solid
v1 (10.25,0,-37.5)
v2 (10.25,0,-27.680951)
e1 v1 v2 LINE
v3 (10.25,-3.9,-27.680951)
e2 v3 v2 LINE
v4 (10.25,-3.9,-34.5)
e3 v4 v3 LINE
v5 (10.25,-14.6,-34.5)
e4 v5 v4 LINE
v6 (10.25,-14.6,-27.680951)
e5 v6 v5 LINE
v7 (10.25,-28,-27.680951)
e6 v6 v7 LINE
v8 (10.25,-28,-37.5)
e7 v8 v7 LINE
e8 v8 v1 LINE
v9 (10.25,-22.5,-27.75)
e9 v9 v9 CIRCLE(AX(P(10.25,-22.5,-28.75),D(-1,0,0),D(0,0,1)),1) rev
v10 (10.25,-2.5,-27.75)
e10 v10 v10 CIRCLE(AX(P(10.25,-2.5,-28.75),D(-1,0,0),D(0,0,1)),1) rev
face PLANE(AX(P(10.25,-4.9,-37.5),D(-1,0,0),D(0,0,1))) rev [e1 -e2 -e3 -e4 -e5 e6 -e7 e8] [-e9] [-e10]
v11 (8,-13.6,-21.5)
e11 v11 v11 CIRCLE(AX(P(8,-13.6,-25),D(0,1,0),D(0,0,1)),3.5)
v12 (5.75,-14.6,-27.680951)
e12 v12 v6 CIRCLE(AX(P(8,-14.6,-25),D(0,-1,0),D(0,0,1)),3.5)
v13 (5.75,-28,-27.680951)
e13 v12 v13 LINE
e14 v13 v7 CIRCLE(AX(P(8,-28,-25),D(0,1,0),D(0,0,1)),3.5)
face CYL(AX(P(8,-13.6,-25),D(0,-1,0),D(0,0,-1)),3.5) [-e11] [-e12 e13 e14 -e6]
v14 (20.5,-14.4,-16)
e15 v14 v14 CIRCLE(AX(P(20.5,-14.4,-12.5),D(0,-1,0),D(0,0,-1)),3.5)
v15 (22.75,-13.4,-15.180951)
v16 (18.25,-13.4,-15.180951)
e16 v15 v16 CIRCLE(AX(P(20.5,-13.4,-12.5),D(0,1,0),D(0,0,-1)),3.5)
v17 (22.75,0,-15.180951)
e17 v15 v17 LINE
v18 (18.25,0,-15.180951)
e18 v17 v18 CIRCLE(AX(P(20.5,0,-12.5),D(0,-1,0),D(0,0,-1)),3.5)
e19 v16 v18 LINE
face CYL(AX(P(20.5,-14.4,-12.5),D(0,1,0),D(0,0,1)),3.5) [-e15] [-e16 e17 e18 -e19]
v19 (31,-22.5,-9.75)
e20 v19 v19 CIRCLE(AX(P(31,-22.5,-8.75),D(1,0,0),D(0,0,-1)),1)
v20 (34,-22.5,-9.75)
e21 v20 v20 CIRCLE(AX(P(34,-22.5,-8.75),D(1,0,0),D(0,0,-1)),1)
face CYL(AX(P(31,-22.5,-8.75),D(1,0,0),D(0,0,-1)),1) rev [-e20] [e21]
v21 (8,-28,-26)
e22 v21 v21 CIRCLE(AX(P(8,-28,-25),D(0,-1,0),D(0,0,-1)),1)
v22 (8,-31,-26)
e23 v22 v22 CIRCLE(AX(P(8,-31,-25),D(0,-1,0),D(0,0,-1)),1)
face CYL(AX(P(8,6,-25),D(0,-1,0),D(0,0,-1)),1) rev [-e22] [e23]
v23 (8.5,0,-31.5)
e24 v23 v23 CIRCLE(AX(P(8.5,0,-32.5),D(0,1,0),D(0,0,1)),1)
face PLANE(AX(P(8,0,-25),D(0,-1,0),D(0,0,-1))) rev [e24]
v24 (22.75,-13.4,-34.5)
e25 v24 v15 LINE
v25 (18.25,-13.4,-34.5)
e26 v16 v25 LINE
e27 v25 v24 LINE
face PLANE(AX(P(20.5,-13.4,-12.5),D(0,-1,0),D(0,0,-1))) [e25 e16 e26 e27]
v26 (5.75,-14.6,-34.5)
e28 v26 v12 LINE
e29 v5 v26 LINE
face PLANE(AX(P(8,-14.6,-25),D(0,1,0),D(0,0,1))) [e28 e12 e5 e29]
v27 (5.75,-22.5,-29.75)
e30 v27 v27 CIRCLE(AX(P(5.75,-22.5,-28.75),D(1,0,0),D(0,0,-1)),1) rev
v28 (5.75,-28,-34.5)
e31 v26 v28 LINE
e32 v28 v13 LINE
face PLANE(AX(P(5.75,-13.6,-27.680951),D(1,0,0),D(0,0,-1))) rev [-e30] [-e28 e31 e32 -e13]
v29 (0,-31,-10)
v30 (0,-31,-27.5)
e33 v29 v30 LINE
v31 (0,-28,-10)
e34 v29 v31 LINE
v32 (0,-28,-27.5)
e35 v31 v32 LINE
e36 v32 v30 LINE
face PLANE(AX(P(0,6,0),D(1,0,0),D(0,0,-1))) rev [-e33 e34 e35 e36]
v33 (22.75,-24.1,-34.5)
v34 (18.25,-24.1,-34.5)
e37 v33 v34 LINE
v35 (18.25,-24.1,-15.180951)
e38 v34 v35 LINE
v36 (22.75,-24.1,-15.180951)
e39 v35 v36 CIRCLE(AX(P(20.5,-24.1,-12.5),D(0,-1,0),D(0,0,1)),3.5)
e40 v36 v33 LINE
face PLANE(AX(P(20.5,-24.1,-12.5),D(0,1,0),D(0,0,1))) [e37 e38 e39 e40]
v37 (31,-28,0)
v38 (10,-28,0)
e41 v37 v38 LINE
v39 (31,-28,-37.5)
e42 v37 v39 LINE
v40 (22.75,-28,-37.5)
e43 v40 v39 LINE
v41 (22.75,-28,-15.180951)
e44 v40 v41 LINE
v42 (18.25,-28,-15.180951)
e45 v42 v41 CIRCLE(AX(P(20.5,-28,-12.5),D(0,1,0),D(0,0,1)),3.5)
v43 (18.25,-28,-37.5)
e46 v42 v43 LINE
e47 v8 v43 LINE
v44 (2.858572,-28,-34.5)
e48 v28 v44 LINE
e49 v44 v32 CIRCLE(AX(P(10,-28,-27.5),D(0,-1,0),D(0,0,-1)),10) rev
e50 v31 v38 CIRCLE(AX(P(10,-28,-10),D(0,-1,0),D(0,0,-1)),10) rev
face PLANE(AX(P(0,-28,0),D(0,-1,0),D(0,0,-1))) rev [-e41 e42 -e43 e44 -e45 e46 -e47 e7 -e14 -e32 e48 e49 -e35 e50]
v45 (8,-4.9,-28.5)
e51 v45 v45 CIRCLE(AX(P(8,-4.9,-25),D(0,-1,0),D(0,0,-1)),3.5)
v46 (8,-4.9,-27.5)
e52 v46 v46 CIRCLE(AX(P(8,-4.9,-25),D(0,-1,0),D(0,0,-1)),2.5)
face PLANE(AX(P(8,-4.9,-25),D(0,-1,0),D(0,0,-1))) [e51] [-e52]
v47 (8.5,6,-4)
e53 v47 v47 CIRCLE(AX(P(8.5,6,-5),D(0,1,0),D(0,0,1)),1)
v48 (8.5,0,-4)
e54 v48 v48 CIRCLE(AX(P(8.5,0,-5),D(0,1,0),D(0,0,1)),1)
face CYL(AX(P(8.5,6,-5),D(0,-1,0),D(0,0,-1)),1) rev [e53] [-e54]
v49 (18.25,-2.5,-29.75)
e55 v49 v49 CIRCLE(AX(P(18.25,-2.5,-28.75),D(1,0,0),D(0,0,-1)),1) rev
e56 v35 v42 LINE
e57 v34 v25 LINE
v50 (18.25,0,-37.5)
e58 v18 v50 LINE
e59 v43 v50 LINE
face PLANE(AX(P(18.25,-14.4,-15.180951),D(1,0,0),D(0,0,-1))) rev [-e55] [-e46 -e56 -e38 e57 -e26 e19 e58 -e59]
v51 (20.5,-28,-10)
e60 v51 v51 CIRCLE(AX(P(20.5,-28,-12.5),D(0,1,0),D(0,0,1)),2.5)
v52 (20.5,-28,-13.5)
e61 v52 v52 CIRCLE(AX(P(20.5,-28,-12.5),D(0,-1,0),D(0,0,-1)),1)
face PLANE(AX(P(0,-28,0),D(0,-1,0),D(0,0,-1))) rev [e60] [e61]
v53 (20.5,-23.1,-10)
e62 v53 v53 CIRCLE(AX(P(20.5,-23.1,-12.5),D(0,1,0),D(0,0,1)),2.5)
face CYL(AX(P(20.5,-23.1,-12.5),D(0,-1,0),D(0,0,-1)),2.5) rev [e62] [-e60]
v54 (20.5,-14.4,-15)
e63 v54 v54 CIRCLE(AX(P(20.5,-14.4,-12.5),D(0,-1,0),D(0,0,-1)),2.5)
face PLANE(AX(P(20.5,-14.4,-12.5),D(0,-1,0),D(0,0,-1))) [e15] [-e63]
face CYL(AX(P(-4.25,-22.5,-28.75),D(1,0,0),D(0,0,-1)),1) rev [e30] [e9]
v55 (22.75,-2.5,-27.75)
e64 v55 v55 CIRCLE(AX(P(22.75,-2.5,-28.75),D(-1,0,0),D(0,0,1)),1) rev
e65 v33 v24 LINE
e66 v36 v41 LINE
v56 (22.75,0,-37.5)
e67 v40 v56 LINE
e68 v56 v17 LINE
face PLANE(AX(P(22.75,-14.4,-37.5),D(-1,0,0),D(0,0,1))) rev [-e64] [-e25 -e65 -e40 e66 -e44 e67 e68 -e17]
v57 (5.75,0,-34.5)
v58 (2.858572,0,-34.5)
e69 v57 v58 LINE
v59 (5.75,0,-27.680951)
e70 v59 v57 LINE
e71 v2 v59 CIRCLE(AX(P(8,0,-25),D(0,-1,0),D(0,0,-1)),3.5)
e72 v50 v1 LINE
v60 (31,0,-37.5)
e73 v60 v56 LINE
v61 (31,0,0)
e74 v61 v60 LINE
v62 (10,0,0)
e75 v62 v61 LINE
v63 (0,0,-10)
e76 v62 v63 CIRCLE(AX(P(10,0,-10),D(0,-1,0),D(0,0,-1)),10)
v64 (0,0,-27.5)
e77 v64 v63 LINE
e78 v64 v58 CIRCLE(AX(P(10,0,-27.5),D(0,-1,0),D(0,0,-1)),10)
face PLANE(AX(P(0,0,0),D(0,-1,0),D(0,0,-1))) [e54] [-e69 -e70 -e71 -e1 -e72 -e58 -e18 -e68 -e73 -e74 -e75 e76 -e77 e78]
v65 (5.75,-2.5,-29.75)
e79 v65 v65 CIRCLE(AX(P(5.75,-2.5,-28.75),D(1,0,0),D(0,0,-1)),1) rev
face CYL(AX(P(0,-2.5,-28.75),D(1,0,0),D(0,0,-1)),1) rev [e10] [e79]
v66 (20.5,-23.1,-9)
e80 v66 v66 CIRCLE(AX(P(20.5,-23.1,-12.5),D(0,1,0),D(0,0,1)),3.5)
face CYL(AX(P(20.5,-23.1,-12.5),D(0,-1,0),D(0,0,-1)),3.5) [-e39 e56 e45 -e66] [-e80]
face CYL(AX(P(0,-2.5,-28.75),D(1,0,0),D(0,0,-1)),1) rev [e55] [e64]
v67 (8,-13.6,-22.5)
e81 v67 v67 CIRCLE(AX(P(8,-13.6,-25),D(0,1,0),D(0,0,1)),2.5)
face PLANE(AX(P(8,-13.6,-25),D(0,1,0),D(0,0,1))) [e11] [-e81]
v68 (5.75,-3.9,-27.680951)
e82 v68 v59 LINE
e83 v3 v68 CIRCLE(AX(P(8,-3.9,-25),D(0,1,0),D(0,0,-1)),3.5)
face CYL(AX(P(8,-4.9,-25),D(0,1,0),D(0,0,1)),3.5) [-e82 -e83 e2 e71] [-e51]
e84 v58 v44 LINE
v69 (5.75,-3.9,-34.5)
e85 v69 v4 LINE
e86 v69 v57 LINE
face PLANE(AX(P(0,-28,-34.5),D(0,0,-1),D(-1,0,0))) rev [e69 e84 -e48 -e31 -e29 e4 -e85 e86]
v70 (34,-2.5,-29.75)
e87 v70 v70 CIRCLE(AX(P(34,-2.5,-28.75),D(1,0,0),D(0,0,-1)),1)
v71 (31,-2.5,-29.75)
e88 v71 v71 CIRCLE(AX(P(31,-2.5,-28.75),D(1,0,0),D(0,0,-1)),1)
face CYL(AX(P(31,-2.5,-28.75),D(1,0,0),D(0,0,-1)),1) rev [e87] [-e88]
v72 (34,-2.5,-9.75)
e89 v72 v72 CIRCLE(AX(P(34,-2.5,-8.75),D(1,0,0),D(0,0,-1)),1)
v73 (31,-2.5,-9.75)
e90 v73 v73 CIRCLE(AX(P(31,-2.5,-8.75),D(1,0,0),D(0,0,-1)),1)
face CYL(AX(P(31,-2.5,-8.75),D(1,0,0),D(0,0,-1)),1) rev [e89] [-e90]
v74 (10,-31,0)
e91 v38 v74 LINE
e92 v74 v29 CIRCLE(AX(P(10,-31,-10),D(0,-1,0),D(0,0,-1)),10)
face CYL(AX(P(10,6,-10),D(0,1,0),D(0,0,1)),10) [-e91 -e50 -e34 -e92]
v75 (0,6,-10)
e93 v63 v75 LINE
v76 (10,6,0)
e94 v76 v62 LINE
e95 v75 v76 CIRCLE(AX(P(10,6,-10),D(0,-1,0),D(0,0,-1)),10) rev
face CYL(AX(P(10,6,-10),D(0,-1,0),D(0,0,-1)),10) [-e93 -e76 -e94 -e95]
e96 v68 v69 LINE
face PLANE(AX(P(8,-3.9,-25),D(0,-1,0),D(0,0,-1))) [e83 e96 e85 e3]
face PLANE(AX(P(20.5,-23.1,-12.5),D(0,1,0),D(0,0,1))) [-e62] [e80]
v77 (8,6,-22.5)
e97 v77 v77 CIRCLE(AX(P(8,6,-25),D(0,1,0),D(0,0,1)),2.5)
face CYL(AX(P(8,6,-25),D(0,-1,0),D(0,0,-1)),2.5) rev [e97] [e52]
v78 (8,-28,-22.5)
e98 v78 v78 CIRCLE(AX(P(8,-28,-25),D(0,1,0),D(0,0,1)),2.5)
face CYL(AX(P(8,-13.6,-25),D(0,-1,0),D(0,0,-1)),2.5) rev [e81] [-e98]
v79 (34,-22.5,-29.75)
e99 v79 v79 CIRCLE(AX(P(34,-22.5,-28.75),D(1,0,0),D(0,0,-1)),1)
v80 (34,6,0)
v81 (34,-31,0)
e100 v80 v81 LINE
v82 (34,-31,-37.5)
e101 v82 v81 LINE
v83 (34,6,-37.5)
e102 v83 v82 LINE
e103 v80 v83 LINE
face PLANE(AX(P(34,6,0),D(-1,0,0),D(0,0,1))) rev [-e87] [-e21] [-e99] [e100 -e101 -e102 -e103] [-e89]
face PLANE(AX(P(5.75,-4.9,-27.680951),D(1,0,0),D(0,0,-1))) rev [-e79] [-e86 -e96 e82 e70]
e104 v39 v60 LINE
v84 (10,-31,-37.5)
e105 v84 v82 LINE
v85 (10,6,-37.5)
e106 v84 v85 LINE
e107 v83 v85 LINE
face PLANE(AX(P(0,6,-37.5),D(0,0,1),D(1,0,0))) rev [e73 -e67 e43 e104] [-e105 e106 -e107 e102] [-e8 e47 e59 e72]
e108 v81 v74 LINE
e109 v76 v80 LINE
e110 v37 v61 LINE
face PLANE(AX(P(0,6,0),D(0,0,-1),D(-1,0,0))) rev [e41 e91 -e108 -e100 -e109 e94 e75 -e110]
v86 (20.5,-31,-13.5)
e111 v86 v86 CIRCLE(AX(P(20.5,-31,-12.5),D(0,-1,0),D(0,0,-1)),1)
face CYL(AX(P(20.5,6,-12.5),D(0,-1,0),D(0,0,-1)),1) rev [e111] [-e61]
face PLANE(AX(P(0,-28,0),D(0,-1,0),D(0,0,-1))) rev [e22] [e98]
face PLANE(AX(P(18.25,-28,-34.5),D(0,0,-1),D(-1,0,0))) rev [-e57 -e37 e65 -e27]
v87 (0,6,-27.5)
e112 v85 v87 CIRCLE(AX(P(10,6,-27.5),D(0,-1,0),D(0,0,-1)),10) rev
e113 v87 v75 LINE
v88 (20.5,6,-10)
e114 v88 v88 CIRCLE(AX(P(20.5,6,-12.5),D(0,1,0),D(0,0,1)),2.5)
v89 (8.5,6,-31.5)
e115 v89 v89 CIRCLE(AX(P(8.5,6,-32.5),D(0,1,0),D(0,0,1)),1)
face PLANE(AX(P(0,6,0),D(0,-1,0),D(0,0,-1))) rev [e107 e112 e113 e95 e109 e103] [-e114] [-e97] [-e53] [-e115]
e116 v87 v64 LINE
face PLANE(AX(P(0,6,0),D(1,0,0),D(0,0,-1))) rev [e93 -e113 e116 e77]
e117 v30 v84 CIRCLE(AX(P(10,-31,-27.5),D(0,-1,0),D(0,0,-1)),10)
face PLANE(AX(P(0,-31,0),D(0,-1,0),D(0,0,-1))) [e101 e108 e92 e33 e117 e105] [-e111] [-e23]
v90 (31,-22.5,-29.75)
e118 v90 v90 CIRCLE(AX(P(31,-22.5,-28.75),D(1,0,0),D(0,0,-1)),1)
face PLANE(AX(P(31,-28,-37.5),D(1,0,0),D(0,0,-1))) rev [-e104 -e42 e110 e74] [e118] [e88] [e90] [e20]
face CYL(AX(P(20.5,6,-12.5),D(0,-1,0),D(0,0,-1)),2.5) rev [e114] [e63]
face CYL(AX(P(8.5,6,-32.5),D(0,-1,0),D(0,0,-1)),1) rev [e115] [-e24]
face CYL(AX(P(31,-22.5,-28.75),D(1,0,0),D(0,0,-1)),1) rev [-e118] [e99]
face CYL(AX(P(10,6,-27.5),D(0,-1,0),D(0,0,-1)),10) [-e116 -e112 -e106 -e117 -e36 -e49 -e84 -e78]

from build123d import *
from build123d.topology import SkipClean

# Parameters (mm, degrees)
TOPSKETCH1_W                                     = 34
TOPSKETCH1_H                                     = 37.5
TOPSKETCH1_R                                     = 1
TOPSKETCH1_R_2                                   = 2.5
BOSS_EXTRUDE1_DEPTH                              = 6
TOPLEFTRISERBOSS_EXTRUDE2_START                  = 4.9
TOPLEFTRISER_R                                   = 2.5
TOPLEFTRISERBOSS_EXTRUDE2_DEPTH                  = 4.9
TOPRIGHTRISERBOSS_EXTRUDE3_START                 = 14.4
TOPRIGHTRISER_R                                  = 2.5
TOPRIGHTRISERBOSS_EXTRUDE3_DEPTH                 = 14.4
MIDWALLSKETCH3_W                                 = 10.25
MIDWALLSKETCH3_H                                 = 3
MIDWALLSKETCH3_W_2                               = 4.5
MIDWALLSKETCH3_W_3                               = 3
MIDWALLSKETCH3_H_2                               = 37.5
WALLBOSS_EXTRUDE4_DEPTH                          = 28
BOTTOMSKETCH4_W                                  = 34
BOTTOMSKETCH4_H                                  = 37.5
BOTTOMBOSS_EXTRUDE5_DEPTH                        = 3
LOWERLEFTRISER_R                                 = 2.5
LOWERLEFTRISERBOSS_EXTRUDE6_DEPTH                = 14.4
LOWERRIGHTRISER_R                                = 2.5
LOWERRIGHTRISERBOSS_EXTRUDE7_DEPTH               = 4.9
FILLET1_R                                        = 10
TOPLEFTINSETCUT_EXTRUDE1_DEPTH                   = 1
TOPRIGHTINSETCUT_EXTRUDE2_DEPTH                  = 1
LOWERLEFTINSETCUT_EXTRUDE3_START                 = -1
LOWERLEFTINSETCUT_EXTRUDE3_DEPTH                 = 1
LOWERRIGHTINSETCUT_EXTRUDE4_START                = -1
LOWERRIGHTINSETCUT_EXTRUDE4_DEPTH                = 1
GBMOUNTINGHOLESSKETCH7_R                         = 1
GBMOUNTINGHOLESCUT_EXTRUDE5_DEPTH                = 3
PUSHPINHOLESKETCH1_R                             = 1
PUSHPINHOLECUT_EXTRUDE1_DEPTH                    = 63.69968102
BOTTOMLEFTMOUNTHOLEACCESSCUT_EXTRUDE2_DEPTH      = 10
BOTTOMLEFTMOUNTHOLEACCESSCUT_EXTRUDE2_DEPTH_BACK = 15
BOTTOMLEFTMOUNTHOLEACCESSSKETCH1_R               = 1
TOPLEFTMOUNTHOLEACCESSCUT_EXTRUDE3_DEPTH         = 52.964531173
TOPLEFTMOUNTHOLEACCESSCUT_EXTRUDE3_DEPTH_BACK    = 5
TOPLEFTMOUNTHOLEACCESSSKETCH2_R                  = 1


with BuildPart() as part:
    # TopSketch1 → Boss-Extrude1 (new body)
    with BuildSketch(Plane(origin=(0, 0, 0), x_dir=(1, 0, 0), z_dir=(0, 1, 0))):
        with Locations((17, 18.75)):
            Rectangle(TOPSKETCH1_W, TOPSKETCH1_H)
        with Locations(Location((8.5, 32.5, 0), (0, 0, 270))):
            Circle(TOPSKETCH1_R, mode=Mode.SUBTRACT)
        with Locations(Location((8.5, 5, 0), (0, 0, 270))):
            Circle(TOPSKETCH1_R, mode=Mode.SUBTRACT)
        with Locations(Location((20.5, 12.5, 0), (0, 0, 270))):
            Circle(TOPSKETCH1_R_2, mode=Mode.SUBTRACT)
        with Locations(Location((8, 25, 0), (0, 0, 270))):
            Circle(TOPSKETCH1_R_2, mode=Mode.SUBTRACT)
    extrude(amount=BOSS_EXTRUDE1_DEPTH)

    # TopLeftRiser → TopLeftRiserBoss-Extrude2 (add)
    with SkipClean():  # the faces are left unmerged after this step: merging them gives an invalid solid
        with BuildSketch(Plane.XZ.offset(TOPLEFTRISERBOSS_EXTRUDE2_START)):
            with BuildLine():
                Line((5.75, -27.680951324), (5.75, -37.5))
                Line((5.75, -37.5), (10.25, -37.5))
                Line((10.25, -37.5), (10.25, -27.680951324))
                ThreePointArc((10.25, -27.680951324), (8, -21.5), (5.75, -27.680951324))
            make_face()
            with Locations(Location((8, -25, 0), (0, 0, 270))):
                Circle(TOPLEFTRISER_R, mode=Mode.SUBTRACT)
        extrude(amount=-TOPLEFTRISERBOSS_EXTRUDE2_DEPTH)

    # TopRightRiser → topRightRiserBoss-Extrude3 (add)
    with SkipClean():  # the faces are left unmerged after this step: merging them gives an invalid solid
        with BuildSketch(Plane.XZ.offset(TOPRIGHTRISERBOSS_EXTRUDE3_START)):
            with BuildLine():
                Line((18.25, -15.180951324), (18.25, -37.5))
                Line((18.25, -37.5), (22.75, -37.5))
                Line((22.75, -37.5), (22.75, -15.180951324))
                ThreePointArc((22.75, -15.180951324), (20.5, -9), (18.25, -15.180951324))
            make_face()
            with Locations(Location((20.5, -12.5, 0), (0, 0, 270))):
                Circle(TOPRIGHTRISER_R, mode=Mode.SUBTRACT)
        extrude(amount=-TOPRIGHTRISERBOSS_EXTRUDE3_DEPTH)

    # MidWallSketch3 → WallBoss-Extrude4 (add)
    with SkipClean():  # the faces are left unmerged after this step: merging them gives an invalid solid
        with BuildSketch(Plane.XZ):
            with Locations((5.125, -36)):
                Rectangle(MIDWALLSKETCH3_W, MIDWALLSKETCH3_H)
            with Locations((20.5, -36)):
                Rectangle(MIDWALLSKETCH3_W_2, MIDWALLSKETCH3_H)
            with Locations((32.5, -18.75)):
                Rectangle(MIDWALLSKETCH3_W_3, MIDWALLSKETCH3_H_2)
        extrude(amount=WALLBOSS_EXTRUDE4_DEPTH)

    # BottomSketch4 → BottomBoss-Extrude5 (add)
    with SkipClean():  # the faces are left unmerged after this step: merging them gives an invalid solid
        with BuildSketch(Plane.XZ.offset(28)):
            with Locations((17, -18.75)):
                Rectangle(BOTTOMSKETCH4_W, BOTTOMSKETCH4_H)
        extrude(amount=BOTTOMBOSS_EXTRUDE5_DEPTH)

    # LowerLeftRiser → LowerLeftRiserBoss-Extrude6 (add)
    with SkipClean():  # the faces are left unmerged after this step: merging them gives an invalid solid
        with BuildSketch(Plane(origin=(0, -28, 0), x_dir=(1, 0, 0), z_dir=(0, 1, 0))):
            with BuildLine():
                Line((5.75, 27.680951324), (5.75, 34.5))
                Line((5.75, 34.5), (10.25, 34.5))
                Line((10.25, 34.5), (10.25, 27.680951324))
                ThreePointArc((10.25, 27.680951324), (8, 21.5), (5.75, 27.680951324))
            make_face()
            with Locations(Location((8, 25, 0), (0, 0, 90))):
                Circle(LOWERLEFTRISER_R, mode=Mode.SUBTRACT)
        extrude(amount=LOWERLEFTRISERBOSS_EXTRUDE6_DEPTH)

    # LowerRightRiser → LowerRightRiserBoss-Extrude7 (add)
    with SkipClean():  # the faces are left unmerged after this step: merging them gives an invalid solid
        with BuildSketch(Plane(origin=(0, -28, 0), x_dir=(1, 0, 0), z_dir=(0, 1, 0))):
            with BuildLine():
                Line((18.25, 15.180951324), (18.25, 34.5))
                Line((18.25, 34.5), (22.75, 34.5))
                Line((22.75, 34.5), (22.75, 15.180951324))
                ThreePointArc((22.75, 15.180951324), (20.5, 9), (18.25, 15.180951324))
            make_face()
            with Locations(Location((20.5, 12.5, 0), (0, 0, 90))):
                Circle(LOWERRIGHTRISER_R, mode=Mode.SUBTRACT)
        extrude(amount=LOWERRIGHTRISERBOSS_EXTRUDE7_DEPTH)

    # Fillet1
    # the kernel refuses this fillet: 10 mm, written as the material it takes off along each edge
    with BuildSketch(Plane(origin=(0, -3, 0), x_dir=(1, 0, 0), z_dir=(0, -1, 0))) as fillet1_piece_1:
        with BuildLine():
            CenterArc((FILLET1_R, -FILLET1_R), FILLET1_R, 90, 90)
            Line((0, -FILLET1_R), (0, 0))
            Line((0, 0), (FILLET1_R, 0))
        make_face()
    extrude(amount=53, mode=Mode.SUBTRACT)
    with BuildSketch(Plane(origin=(0, -25, 0), x_dir=(1, 0, 0), z_dir=(0, 1, 0))) as fillet1_piece_2:
        with BuildLine():
            CenterArc((FILLET1_R, FILLET1_R), FILLET1_R, 180, 90)
            Line((0, FILLET1_R), (0, 0))
            Line((0, 0), (FILLET1_R, 0))
        make_face()
    extrude(amount=56, mode=Mode.SUBTRACT)
    with BuildSketch(Plane(origin=(0, 0, -37.5), x_dir=(0, 0, 1), z_dir=(0, -1, 0)), Plane(origin=(0, -28, -37.5), x_dir=(0, 0, 1), z_dir=(0, -1, 0))) as fillet1_piece_3:
        with BuildLine():
            CenterArc((FILLET1_R, -FILLET1_R), FILLET1_R, 90, 90)
            Line((0, -FILLET1_R), (0, 0))
            Line((0, 0), (FILLET1_R, 0))
        make_face()
    extrude(amount=28, mode=Mode.SUBTRACT)
    with BuildSketch(Plane(origin=(0, 0, -37.5), x_dir=(0, 0, 1), z_dir=(0, 1, 0))) as fillet1_piece_4:
        with BuildLine():
            CenterArc((FILLET1_R, FILLET1_R), FILLET1_R, 180, 90)
            Line((0, FILLET1_R), (0, 0))
            Line((0, 0), (FILLET1_R, 0))
        make_face()
    extrude(amount=31, mode=Mode.SUBTRACT)

    # TopLeftInset → TopLeftInsetCut-Extrude1 (cut)
    with BuildSketch(Plane.XZ.offset(4.9)):
        with BuildLine():
            Line((5.75, -27.680951324), (5.75, -34.5))
            Line((5.75, -34.5), (10.25, -34.5))
            Line((10.25, -34.5), (10.25, -27.680951324))
            ThreePointArc((10.25, -27.680951324), (8, -28.5), (5.75, -27.680951324))
        make_face()
    extrude(amount=-TOPLEFTINSETCUT_EXTRUDE1_DEPTH, mode=Mode.SUBTRACT)

    # TopRightInset → TopRightInsetCut-Extrude2 (cut)
    with SkipClean():  # the faces are left unmerged after this step: merging them gives an invalid solid
        with BuildSketch(Plane.XZ.offset(14.4)):
            with BuildLine():
                Line((18.25, -15.180951324), (18.25, -34.5))
                Line((18.25, -34.5), (22.75, -34.5))
                Line((22.75, -34.5), (22.75, -15.180951324))
                ThreePointArc((22.75, -15.180951324), (20.5, -16), (18.25, -15.180951324))
            make_face()
        extrude(amount=-TOPRIGHTINSETCUT_EXTRUDE2_DEPTH, mode=Mode.SUBTRACT)
    add(part.part.scale(1), mode=Mode.REPLACE)  # the faces are merged on a copy

    # LowerLeftInset → LowerLeftInsetCut-Extrude3 (cut)
    with BuildSketch(Plane(origin=(0, -13.6, 0), x_dir=(1, 0, 0), z_dir=(0, 1, 0)).offset(LOWERLEFTINSETCUT_EXTRUDE3_START)):
        with BuildLine():
            Line((5.75, 27.680951324), (5.75, 34.5))
            Line((5.75, 34.5), (10.25, 34.5))
            Line((10.25, 34.5), (10.25, 27.680951324))
            ThreePointArc((10.25, 27.680951324), (8, 28.5), (5.75, 27.680951324))
        make_face()
    extrude(amount=LOWERLEFTINSETCUT_EXTRUDE3_DEPTH, mode=Mode.SUBTRACT)

    # LowerRightInset → LowerRightInsetCut-Extrude4 (cut)
    with BuildSketch(Plane(origin=(0, -23.1, 0), x_dir=(1, 0, 0), z_dir=(0, 1, 0)).offset(LOWERRIGHTINSETCUT_EXTRUDE4_START)):
        with BuildLine():
            Line((18.25, 15.180951324), (18.25, 34.5))
            Line((18.25, 34.5), (22.75, 34.5))
            Line((22.75, 34.5), (22.75, 15.180951324))
            ThreePointArc((22.75, 15.180951324), (20.5, 16), (18.25, 15.180951324))
        make_face()
    extrude(amount=LOWERRIGHTINSETCUT_EXTRUDE4_DEPTH, mode=Mode.SUBTRACT)

    # GBMountingHolesSketch7 → GBMountingHolesCut-Extrude5 (cut)
    with BuildSketch(Plane(origin=(34, 0, 0), x_dir=(0, 0, -1), z_dir=(1, 0, 0))):
        with Locations((8.75, -2.5)):
            Circle(GBMOUNTINGHOLESSKETCH7_R)
        with Locations((8.75, -22.5)):
            Circle(GBMOUNTINGHOLESSKETCH7_R)
        with Locations((28.75, -22.5)):
            Circle(GBMOUNTINGHOLESSKETCH7_R)
        with Locations((28.75, -2.5)):
            Circle(GBMOUNTINGHOLESSKETCH7_R)
    extrude(amount=-GBMOUNTINGHOLESCUT_EXTRUDE5_DEPTH, mode=Mode.SUBTRACT)

    # PushPinHoleSketch1 → PushPinHoleCut-Extrude1 (cut, through all)
    with BuildSketch(Plane.XZ.offset(31)):
        with Locations(Location((20.5, -12.5, 0), (0, 0, 270))):
            Circle(PUSHPINHOLESKETCH1_R)
        with Locations(Location((8, -25, 0), (0, 0, 270))):
            Circle(PUSHPINHOLESKETCH1_R)
    extrude(amount=-PUSHPINHOLECUT_EXTRUDE1_DEPTH, mode=Mode.SUBTRACT)

    # BottomLeftMountHoleAccessSketch1 → BottomLeftMountHoleAccessCut-Extrude2 (cut, two sides: drawn at the far end of the back side and taken through both)
    with BuildSketch(Plane.ZY.offset(-5.75).offset(-BOTTOMLEFTMOUNTHOLEACCESSCUT_EXTRUDE2_DEPTH_BACK)):
        with Locations(Location((-28.75, -22.5, 0), (0, 0, 180))):
            Circle(BOTTOMLEFTMOUNTHOLEACCESSSKETCH1_R)
    extrude(amount=BOTTOMLEFTMOUNTHOLEACCESSCUT_EXTRUDE2_DEPTH + BOTTOMLEFTMOUNTHOLEACCESSCUT_EXTRUDE2_DEPTH_BACK, mode=Mode.SUBTRACT)

    # TopLeftMountHoleAccessSketch2 → TopLeftMountHoleAccessCut-Extrude3 (cut, two sides: drawn at the far end of the back side and taken through both)
    with BuildSketch(Plane.ZY.offset(-18.25).offset(-TOPLEFTMOUNTHOLEACCESSCUT_EXTRUDE3_DEPTH_BACK)):
        with Locations(Location((-28.75, -2.5, 0), (0, 0, 180))):
            Circle(TOPLEFTMOUNTHOLEACCESSSKETCH2_R)
    extrude(amount=TOPLEFTMOUNTHOLEACCESSCUT_EXTRUDE3_DEPTH + TOPLEFTMOUNTHOLEACCESSCUT_EXTRUDE3_DEPTH_BACK, mode=Mode.SUBTRACT)


solid = part.part
